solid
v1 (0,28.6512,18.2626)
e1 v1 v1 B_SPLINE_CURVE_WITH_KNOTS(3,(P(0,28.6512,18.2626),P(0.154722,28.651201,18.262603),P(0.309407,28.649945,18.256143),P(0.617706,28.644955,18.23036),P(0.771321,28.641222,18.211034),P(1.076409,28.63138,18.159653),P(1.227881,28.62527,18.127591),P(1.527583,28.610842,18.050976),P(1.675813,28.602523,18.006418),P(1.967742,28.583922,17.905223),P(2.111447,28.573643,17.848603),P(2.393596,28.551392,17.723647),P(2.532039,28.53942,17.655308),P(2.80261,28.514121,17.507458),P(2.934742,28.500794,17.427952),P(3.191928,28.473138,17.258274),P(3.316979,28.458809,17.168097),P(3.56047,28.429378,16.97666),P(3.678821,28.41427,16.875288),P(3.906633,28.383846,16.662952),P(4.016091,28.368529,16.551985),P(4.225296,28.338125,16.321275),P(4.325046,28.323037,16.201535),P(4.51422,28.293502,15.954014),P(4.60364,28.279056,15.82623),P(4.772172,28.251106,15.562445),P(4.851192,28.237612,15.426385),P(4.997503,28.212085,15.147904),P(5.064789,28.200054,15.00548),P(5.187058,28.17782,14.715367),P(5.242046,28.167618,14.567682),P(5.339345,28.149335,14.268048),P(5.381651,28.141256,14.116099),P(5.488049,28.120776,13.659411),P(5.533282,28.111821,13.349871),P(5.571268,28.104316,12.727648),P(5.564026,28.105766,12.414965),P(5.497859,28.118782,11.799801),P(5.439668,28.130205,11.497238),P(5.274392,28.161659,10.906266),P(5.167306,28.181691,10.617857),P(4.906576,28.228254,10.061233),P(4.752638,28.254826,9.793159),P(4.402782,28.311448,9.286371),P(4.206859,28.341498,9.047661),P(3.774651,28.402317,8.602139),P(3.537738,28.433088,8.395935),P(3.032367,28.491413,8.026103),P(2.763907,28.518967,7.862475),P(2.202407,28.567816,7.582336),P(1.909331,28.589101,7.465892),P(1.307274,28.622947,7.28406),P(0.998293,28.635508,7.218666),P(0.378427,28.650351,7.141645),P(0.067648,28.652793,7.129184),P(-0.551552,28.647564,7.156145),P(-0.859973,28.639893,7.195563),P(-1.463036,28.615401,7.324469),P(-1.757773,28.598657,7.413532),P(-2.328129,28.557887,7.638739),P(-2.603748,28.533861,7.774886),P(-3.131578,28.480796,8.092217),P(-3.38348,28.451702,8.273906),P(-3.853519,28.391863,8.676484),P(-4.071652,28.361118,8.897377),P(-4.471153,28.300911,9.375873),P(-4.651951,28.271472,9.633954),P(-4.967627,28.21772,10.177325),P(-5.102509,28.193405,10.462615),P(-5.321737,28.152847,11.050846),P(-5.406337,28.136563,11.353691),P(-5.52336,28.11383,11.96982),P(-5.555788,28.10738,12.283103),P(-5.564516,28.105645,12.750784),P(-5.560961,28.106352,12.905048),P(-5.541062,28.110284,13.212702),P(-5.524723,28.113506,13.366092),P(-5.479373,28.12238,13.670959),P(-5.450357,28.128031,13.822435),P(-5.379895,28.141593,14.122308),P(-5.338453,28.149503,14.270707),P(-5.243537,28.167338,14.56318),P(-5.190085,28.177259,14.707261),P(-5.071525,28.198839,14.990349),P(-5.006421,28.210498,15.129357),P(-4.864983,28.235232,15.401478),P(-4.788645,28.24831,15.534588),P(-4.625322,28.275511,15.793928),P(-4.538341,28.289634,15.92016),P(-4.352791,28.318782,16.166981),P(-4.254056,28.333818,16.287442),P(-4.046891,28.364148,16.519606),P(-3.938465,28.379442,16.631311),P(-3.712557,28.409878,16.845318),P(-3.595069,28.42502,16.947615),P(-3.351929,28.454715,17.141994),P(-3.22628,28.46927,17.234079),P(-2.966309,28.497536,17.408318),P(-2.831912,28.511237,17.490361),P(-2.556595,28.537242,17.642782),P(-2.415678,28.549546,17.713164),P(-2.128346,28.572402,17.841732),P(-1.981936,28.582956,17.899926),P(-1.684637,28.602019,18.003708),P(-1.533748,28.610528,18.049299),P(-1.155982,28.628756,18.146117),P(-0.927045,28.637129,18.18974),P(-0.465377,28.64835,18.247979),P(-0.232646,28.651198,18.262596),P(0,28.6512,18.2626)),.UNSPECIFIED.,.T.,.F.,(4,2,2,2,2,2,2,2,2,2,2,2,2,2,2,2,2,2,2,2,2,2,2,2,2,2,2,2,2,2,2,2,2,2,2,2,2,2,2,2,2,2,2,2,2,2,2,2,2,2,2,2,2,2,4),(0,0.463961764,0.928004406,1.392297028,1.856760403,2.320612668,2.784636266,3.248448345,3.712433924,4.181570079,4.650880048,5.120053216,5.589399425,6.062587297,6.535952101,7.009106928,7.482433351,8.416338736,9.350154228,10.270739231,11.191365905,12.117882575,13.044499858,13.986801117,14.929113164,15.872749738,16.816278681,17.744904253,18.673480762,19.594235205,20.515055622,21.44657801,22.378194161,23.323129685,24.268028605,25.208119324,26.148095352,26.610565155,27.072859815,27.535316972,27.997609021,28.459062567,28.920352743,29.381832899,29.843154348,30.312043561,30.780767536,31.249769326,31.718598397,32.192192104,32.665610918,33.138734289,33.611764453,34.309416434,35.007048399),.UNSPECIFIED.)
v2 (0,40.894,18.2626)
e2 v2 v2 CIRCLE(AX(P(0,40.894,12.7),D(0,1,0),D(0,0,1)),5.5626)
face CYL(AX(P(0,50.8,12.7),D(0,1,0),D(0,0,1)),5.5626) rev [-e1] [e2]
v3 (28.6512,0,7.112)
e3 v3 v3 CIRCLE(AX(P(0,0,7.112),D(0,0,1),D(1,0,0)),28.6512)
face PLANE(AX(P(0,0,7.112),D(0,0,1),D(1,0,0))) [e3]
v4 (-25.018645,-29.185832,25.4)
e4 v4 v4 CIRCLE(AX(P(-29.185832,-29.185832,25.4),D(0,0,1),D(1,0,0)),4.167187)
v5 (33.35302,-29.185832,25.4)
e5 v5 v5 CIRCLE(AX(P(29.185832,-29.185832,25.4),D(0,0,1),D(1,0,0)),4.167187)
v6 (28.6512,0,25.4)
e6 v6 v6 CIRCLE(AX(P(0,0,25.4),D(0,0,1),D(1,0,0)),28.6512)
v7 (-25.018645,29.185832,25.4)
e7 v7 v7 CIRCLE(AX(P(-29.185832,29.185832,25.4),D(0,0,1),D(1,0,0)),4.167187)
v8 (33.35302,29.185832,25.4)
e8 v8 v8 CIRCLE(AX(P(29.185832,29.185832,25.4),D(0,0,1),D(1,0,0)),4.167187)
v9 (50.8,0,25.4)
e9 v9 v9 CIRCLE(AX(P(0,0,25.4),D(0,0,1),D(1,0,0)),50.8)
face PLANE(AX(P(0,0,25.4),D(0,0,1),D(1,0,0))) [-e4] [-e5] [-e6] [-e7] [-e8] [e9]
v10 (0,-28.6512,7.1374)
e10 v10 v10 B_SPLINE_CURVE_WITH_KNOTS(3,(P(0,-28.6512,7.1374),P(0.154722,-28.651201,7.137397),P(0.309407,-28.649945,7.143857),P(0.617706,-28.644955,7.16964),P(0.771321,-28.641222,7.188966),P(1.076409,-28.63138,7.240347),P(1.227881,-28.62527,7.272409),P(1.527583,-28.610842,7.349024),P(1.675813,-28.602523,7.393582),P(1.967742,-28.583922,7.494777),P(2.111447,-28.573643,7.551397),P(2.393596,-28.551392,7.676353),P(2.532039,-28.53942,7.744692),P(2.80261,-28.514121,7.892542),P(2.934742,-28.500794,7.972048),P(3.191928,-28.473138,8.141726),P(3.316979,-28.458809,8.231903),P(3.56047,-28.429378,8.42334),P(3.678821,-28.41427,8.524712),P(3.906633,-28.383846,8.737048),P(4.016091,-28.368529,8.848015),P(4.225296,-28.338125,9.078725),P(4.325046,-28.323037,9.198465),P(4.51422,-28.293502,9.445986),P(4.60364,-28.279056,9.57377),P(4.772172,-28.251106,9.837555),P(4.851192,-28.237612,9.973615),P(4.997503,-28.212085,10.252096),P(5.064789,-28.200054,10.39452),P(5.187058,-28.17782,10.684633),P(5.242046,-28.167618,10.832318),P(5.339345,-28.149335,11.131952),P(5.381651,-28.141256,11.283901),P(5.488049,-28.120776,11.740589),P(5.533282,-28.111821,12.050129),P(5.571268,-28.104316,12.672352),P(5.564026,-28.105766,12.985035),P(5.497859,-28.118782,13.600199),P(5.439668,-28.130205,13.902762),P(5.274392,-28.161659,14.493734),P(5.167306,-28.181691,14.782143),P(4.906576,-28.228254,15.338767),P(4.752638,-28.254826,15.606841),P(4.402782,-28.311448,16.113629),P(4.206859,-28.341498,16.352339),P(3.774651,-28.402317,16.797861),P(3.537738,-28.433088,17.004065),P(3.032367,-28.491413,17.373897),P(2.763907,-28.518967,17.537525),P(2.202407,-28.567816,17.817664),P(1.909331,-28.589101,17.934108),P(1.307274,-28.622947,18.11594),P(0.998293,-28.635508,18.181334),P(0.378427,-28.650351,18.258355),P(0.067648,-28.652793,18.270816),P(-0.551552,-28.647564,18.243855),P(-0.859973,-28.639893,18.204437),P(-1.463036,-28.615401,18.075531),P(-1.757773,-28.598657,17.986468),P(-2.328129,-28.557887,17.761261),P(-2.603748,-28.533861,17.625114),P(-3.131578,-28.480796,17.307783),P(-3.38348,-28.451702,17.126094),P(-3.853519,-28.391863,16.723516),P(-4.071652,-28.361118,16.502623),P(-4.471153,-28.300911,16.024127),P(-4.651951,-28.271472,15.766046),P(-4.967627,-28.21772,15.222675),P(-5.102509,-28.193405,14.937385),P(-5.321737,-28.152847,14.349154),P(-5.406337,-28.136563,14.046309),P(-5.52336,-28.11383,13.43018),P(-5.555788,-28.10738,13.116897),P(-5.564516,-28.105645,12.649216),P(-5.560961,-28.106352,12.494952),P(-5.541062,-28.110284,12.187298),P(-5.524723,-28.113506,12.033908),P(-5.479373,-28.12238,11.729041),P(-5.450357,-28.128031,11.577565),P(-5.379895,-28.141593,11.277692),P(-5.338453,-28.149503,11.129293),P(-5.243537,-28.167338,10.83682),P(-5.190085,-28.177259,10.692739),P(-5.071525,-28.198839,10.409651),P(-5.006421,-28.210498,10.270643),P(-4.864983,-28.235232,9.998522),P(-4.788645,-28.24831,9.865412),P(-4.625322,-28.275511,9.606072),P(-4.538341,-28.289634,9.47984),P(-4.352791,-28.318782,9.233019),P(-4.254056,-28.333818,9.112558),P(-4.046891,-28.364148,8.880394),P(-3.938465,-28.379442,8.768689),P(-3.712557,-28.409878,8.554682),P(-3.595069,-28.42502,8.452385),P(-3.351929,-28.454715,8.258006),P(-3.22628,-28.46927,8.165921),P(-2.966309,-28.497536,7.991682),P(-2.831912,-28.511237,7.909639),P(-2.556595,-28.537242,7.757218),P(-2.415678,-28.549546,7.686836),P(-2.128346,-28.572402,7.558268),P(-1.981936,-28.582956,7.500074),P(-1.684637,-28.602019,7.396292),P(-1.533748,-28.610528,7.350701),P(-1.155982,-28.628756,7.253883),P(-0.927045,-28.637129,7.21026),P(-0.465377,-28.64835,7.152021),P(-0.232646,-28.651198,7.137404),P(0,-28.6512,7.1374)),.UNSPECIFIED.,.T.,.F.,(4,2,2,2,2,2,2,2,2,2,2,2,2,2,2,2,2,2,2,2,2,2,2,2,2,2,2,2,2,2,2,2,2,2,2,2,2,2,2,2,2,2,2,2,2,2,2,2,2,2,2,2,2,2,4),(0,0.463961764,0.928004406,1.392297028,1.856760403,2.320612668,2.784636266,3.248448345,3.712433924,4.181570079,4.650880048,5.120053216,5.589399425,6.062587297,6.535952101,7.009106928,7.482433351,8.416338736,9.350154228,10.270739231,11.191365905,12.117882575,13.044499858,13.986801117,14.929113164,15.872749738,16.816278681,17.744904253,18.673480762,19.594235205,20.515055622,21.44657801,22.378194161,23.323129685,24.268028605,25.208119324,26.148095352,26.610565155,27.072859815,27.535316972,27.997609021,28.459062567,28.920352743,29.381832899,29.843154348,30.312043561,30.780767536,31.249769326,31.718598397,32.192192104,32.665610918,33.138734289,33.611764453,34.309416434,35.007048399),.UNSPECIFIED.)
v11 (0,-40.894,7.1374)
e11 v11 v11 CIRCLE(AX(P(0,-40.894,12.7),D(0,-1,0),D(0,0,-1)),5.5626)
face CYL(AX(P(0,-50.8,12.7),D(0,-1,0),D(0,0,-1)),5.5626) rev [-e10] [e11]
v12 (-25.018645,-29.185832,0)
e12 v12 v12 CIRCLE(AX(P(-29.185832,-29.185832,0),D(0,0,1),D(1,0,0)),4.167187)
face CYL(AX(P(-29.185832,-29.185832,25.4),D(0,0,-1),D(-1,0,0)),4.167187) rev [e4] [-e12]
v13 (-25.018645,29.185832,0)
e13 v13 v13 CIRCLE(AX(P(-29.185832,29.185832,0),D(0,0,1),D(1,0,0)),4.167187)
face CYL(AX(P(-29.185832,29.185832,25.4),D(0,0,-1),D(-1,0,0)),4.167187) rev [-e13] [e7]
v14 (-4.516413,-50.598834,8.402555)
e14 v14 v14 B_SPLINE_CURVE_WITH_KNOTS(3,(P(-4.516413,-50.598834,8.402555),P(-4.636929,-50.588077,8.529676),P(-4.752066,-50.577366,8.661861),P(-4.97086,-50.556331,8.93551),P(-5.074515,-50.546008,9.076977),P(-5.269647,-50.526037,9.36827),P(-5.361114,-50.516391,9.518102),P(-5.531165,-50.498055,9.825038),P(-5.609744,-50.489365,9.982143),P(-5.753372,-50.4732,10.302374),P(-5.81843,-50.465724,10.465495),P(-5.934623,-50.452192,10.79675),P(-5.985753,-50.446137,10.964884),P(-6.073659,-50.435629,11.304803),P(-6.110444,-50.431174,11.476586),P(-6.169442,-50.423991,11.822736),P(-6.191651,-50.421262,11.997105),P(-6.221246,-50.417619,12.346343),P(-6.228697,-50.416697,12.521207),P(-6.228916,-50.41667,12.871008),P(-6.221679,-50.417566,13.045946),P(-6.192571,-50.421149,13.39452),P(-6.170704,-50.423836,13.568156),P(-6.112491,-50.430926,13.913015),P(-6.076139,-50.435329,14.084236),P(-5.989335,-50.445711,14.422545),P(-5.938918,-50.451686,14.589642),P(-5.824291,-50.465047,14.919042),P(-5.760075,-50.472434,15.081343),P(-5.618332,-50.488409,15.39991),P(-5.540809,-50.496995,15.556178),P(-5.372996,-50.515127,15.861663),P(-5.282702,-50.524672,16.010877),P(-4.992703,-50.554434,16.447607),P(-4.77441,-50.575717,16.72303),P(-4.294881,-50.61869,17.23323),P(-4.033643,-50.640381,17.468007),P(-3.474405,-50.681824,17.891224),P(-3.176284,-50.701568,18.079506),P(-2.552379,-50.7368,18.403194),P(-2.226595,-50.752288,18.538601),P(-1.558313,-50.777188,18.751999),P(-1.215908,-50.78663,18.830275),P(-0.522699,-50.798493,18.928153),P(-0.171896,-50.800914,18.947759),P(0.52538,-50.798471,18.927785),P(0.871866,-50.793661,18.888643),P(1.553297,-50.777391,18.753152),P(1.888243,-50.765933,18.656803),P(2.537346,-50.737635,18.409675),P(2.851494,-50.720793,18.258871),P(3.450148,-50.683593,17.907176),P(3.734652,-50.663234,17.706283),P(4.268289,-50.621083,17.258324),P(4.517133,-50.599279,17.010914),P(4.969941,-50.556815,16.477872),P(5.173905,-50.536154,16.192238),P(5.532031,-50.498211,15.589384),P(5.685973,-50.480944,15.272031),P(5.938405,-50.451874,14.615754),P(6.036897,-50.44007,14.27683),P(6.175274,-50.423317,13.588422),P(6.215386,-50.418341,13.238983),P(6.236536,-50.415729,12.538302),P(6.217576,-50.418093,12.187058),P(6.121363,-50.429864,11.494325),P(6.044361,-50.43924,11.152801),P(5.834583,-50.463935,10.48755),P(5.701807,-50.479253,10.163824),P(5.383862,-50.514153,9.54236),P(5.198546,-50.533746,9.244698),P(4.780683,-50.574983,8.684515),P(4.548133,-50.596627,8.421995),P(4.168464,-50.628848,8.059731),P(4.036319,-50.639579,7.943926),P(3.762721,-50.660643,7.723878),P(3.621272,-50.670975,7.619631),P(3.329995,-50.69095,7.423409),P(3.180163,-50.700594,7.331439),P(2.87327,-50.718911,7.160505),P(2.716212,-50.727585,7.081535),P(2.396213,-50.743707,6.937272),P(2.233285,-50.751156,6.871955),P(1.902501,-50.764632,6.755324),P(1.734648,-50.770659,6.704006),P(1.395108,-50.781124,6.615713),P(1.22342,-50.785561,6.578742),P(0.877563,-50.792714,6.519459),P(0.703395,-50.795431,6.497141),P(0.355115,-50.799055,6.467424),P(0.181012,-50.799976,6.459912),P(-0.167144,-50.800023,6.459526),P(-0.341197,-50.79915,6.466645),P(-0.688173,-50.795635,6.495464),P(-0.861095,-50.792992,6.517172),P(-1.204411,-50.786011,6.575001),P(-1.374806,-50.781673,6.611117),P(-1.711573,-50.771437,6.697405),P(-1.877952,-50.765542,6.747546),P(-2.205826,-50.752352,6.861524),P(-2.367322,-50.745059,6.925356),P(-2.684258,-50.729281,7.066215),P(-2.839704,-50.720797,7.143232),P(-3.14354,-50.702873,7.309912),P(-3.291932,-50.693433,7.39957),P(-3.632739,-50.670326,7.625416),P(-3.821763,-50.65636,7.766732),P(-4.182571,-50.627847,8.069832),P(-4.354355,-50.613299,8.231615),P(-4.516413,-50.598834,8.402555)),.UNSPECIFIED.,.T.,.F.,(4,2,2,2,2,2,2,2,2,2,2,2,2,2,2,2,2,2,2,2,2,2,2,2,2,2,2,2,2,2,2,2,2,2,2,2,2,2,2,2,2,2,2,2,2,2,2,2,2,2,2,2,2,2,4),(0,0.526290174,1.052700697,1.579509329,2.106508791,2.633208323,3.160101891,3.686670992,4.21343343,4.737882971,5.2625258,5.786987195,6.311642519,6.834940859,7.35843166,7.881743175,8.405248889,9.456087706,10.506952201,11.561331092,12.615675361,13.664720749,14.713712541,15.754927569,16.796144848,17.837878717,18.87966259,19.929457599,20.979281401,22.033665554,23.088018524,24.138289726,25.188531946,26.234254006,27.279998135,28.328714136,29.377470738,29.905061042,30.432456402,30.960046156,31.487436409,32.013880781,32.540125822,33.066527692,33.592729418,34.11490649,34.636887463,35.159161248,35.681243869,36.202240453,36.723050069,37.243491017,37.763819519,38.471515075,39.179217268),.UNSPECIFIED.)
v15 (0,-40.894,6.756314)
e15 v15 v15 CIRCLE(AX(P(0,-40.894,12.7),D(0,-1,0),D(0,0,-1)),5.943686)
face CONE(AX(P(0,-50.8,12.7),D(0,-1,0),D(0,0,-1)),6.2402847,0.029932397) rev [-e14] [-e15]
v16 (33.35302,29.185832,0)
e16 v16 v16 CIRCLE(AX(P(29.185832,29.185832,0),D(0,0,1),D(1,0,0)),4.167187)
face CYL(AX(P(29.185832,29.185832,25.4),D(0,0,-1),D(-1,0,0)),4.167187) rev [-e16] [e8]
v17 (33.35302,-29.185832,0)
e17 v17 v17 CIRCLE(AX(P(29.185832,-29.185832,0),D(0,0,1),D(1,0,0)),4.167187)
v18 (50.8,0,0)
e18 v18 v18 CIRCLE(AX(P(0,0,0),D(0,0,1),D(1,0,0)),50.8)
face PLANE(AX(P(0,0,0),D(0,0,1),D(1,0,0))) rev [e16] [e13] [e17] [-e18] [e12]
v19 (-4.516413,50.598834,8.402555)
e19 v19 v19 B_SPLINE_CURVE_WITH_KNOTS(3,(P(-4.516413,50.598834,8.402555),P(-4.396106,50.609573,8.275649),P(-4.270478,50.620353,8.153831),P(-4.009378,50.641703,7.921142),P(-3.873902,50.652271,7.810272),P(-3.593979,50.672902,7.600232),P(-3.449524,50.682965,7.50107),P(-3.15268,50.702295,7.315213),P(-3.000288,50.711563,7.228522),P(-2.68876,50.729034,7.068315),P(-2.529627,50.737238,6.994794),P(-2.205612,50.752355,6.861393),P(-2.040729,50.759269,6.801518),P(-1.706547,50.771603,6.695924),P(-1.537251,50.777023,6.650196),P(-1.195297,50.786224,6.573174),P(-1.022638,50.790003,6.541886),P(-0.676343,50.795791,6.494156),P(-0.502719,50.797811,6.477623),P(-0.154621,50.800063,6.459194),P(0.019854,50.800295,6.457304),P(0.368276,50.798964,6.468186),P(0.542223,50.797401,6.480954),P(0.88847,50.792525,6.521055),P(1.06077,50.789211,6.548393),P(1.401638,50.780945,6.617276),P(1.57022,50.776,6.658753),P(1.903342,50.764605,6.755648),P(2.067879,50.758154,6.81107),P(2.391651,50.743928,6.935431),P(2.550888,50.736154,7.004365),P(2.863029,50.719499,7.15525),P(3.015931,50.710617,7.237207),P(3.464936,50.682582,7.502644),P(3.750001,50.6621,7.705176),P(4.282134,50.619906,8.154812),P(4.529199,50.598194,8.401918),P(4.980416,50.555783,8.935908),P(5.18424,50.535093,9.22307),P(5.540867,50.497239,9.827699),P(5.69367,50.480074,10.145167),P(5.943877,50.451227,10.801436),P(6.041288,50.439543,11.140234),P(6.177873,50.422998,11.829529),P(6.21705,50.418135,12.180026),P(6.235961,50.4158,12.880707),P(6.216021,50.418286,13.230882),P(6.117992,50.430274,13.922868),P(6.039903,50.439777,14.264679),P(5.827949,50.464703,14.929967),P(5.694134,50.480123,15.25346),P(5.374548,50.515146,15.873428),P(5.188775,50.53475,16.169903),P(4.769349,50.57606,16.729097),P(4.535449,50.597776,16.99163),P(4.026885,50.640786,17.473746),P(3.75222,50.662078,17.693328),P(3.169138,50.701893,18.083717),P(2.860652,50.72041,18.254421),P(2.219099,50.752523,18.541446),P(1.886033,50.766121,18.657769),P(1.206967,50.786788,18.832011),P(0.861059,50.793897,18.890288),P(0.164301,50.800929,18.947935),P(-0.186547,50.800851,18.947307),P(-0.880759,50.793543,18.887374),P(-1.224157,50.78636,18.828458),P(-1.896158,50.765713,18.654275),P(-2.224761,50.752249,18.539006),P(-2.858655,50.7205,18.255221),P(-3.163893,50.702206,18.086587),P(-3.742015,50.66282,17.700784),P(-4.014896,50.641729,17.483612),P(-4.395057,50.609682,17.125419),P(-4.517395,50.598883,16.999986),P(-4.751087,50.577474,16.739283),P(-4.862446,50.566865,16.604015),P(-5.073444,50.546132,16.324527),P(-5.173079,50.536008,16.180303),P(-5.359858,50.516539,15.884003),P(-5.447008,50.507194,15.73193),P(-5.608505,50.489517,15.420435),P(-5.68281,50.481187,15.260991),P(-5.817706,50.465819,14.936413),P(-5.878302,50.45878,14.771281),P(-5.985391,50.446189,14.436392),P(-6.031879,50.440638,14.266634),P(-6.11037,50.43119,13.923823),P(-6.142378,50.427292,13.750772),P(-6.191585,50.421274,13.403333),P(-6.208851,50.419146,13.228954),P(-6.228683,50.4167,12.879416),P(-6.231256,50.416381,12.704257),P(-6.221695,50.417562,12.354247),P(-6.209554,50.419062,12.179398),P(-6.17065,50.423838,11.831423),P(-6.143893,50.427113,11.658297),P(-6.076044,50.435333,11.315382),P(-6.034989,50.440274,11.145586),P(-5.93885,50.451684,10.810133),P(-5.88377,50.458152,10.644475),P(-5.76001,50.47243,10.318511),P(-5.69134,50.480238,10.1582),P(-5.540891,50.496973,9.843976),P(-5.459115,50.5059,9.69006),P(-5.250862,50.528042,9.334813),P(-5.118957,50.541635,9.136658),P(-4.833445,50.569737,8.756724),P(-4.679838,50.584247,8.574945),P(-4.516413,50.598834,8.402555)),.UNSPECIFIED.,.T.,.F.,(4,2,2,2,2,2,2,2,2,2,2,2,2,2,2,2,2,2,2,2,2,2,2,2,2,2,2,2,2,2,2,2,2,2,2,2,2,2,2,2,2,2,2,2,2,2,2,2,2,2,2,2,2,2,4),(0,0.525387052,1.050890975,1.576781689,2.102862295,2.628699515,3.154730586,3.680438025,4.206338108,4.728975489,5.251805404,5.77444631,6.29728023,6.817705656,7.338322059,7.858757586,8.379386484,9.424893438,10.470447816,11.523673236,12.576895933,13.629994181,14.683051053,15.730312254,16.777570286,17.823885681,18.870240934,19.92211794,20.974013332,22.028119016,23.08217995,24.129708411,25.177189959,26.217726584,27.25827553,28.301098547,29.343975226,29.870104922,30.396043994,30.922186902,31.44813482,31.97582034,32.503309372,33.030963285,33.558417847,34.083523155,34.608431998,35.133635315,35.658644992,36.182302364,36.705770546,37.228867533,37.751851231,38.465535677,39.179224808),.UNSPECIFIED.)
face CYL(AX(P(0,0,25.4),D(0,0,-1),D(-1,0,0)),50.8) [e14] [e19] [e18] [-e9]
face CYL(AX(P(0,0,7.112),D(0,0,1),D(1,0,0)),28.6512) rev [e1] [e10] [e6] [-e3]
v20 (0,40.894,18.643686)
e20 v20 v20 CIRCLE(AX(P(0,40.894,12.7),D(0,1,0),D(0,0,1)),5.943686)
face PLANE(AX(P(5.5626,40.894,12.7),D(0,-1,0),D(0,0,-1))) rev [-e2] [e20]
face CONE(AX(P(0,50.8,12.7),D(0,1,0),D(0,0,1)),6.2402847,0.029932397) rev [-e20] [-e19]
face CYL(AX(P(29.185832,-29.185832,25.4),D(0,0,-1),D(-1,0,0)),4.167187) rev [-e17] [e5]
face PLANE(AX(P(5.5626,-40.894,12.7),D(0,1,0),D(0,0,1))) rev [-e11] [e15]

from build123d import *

# Parameters (mm, degrees)
SKETCH1_R           = 50.8
SKETCH1_R_2         = 4.1671875
BOSS_EXTRUDE1_DEPTH = 25.4
SKETCH2_R           = 28.6512
CUT_EXTRUDE1_DEPTH  = 18.288


# Read off the part's stored shape, not the designer's step: 1/4 NPT Tapped Hole1
with BuildPart() as part:
    # Sketch1 → Boss-Extrude1 (new body)
    with BuildSketch(Plane.XY):
        Circle(SKETCH1_R)
        with Locations((-29.185832393, 29.185832393)):
            Circle(SKETCH1_R_2, mode=Mode.SUBTRACT)
        with Locations((-29.185832393, -29.185832393)):
            Circle(SKETCH1_R_2, mode=Mode.SUBTRACT)
        with Locations((29.185832393, -29.185832393)):
            Circle(SKETCH1_R_2, mode=Mode.SUBTRACT)
        with Locations((29.185832393, 29.185832393)):
            Circle(SKETCH1_R_2, mode=Mode.SUBTRACT)
    extrude(amount=BOSS_EXTRUDE1_DEPTH)

    # Sketch2 → Cut-Extrude1 (cut)
    with BuildSketch(Plane.XY.offset(25.4)):
        Circle(SKETCH2_R)
    extrude(amount=-CUT_EXTRUDE1_DEPTH, mode=Mode.SUBTRACT)

    # 1/4 NPT Tapped Hole1 outline → 1/4 NPT Tapped Hole1 (revolve, cut)
    with BuildSketch(Plane.XY.offset(12.7)):
        Polygon((6.24028647, -50.800059108), (5.943685794, -40.894), (5.5626, -40.894), (5.5626, -28.105874104), (0, -28.105874104), (0, -50.800059108), align=None)
        Polygon((0, 28.105874104), (5.5626, 28.105874104), (5.5626, 40.894), (5.943685794, 40.894), (6.2402863, 50.800053431), (0, 50.800053431), align=None)
    revolve(axis=Axis((0, 0, 12.7), (0, 1, 0)), mode=Mode.SUBTRACT)


solid = part.part
